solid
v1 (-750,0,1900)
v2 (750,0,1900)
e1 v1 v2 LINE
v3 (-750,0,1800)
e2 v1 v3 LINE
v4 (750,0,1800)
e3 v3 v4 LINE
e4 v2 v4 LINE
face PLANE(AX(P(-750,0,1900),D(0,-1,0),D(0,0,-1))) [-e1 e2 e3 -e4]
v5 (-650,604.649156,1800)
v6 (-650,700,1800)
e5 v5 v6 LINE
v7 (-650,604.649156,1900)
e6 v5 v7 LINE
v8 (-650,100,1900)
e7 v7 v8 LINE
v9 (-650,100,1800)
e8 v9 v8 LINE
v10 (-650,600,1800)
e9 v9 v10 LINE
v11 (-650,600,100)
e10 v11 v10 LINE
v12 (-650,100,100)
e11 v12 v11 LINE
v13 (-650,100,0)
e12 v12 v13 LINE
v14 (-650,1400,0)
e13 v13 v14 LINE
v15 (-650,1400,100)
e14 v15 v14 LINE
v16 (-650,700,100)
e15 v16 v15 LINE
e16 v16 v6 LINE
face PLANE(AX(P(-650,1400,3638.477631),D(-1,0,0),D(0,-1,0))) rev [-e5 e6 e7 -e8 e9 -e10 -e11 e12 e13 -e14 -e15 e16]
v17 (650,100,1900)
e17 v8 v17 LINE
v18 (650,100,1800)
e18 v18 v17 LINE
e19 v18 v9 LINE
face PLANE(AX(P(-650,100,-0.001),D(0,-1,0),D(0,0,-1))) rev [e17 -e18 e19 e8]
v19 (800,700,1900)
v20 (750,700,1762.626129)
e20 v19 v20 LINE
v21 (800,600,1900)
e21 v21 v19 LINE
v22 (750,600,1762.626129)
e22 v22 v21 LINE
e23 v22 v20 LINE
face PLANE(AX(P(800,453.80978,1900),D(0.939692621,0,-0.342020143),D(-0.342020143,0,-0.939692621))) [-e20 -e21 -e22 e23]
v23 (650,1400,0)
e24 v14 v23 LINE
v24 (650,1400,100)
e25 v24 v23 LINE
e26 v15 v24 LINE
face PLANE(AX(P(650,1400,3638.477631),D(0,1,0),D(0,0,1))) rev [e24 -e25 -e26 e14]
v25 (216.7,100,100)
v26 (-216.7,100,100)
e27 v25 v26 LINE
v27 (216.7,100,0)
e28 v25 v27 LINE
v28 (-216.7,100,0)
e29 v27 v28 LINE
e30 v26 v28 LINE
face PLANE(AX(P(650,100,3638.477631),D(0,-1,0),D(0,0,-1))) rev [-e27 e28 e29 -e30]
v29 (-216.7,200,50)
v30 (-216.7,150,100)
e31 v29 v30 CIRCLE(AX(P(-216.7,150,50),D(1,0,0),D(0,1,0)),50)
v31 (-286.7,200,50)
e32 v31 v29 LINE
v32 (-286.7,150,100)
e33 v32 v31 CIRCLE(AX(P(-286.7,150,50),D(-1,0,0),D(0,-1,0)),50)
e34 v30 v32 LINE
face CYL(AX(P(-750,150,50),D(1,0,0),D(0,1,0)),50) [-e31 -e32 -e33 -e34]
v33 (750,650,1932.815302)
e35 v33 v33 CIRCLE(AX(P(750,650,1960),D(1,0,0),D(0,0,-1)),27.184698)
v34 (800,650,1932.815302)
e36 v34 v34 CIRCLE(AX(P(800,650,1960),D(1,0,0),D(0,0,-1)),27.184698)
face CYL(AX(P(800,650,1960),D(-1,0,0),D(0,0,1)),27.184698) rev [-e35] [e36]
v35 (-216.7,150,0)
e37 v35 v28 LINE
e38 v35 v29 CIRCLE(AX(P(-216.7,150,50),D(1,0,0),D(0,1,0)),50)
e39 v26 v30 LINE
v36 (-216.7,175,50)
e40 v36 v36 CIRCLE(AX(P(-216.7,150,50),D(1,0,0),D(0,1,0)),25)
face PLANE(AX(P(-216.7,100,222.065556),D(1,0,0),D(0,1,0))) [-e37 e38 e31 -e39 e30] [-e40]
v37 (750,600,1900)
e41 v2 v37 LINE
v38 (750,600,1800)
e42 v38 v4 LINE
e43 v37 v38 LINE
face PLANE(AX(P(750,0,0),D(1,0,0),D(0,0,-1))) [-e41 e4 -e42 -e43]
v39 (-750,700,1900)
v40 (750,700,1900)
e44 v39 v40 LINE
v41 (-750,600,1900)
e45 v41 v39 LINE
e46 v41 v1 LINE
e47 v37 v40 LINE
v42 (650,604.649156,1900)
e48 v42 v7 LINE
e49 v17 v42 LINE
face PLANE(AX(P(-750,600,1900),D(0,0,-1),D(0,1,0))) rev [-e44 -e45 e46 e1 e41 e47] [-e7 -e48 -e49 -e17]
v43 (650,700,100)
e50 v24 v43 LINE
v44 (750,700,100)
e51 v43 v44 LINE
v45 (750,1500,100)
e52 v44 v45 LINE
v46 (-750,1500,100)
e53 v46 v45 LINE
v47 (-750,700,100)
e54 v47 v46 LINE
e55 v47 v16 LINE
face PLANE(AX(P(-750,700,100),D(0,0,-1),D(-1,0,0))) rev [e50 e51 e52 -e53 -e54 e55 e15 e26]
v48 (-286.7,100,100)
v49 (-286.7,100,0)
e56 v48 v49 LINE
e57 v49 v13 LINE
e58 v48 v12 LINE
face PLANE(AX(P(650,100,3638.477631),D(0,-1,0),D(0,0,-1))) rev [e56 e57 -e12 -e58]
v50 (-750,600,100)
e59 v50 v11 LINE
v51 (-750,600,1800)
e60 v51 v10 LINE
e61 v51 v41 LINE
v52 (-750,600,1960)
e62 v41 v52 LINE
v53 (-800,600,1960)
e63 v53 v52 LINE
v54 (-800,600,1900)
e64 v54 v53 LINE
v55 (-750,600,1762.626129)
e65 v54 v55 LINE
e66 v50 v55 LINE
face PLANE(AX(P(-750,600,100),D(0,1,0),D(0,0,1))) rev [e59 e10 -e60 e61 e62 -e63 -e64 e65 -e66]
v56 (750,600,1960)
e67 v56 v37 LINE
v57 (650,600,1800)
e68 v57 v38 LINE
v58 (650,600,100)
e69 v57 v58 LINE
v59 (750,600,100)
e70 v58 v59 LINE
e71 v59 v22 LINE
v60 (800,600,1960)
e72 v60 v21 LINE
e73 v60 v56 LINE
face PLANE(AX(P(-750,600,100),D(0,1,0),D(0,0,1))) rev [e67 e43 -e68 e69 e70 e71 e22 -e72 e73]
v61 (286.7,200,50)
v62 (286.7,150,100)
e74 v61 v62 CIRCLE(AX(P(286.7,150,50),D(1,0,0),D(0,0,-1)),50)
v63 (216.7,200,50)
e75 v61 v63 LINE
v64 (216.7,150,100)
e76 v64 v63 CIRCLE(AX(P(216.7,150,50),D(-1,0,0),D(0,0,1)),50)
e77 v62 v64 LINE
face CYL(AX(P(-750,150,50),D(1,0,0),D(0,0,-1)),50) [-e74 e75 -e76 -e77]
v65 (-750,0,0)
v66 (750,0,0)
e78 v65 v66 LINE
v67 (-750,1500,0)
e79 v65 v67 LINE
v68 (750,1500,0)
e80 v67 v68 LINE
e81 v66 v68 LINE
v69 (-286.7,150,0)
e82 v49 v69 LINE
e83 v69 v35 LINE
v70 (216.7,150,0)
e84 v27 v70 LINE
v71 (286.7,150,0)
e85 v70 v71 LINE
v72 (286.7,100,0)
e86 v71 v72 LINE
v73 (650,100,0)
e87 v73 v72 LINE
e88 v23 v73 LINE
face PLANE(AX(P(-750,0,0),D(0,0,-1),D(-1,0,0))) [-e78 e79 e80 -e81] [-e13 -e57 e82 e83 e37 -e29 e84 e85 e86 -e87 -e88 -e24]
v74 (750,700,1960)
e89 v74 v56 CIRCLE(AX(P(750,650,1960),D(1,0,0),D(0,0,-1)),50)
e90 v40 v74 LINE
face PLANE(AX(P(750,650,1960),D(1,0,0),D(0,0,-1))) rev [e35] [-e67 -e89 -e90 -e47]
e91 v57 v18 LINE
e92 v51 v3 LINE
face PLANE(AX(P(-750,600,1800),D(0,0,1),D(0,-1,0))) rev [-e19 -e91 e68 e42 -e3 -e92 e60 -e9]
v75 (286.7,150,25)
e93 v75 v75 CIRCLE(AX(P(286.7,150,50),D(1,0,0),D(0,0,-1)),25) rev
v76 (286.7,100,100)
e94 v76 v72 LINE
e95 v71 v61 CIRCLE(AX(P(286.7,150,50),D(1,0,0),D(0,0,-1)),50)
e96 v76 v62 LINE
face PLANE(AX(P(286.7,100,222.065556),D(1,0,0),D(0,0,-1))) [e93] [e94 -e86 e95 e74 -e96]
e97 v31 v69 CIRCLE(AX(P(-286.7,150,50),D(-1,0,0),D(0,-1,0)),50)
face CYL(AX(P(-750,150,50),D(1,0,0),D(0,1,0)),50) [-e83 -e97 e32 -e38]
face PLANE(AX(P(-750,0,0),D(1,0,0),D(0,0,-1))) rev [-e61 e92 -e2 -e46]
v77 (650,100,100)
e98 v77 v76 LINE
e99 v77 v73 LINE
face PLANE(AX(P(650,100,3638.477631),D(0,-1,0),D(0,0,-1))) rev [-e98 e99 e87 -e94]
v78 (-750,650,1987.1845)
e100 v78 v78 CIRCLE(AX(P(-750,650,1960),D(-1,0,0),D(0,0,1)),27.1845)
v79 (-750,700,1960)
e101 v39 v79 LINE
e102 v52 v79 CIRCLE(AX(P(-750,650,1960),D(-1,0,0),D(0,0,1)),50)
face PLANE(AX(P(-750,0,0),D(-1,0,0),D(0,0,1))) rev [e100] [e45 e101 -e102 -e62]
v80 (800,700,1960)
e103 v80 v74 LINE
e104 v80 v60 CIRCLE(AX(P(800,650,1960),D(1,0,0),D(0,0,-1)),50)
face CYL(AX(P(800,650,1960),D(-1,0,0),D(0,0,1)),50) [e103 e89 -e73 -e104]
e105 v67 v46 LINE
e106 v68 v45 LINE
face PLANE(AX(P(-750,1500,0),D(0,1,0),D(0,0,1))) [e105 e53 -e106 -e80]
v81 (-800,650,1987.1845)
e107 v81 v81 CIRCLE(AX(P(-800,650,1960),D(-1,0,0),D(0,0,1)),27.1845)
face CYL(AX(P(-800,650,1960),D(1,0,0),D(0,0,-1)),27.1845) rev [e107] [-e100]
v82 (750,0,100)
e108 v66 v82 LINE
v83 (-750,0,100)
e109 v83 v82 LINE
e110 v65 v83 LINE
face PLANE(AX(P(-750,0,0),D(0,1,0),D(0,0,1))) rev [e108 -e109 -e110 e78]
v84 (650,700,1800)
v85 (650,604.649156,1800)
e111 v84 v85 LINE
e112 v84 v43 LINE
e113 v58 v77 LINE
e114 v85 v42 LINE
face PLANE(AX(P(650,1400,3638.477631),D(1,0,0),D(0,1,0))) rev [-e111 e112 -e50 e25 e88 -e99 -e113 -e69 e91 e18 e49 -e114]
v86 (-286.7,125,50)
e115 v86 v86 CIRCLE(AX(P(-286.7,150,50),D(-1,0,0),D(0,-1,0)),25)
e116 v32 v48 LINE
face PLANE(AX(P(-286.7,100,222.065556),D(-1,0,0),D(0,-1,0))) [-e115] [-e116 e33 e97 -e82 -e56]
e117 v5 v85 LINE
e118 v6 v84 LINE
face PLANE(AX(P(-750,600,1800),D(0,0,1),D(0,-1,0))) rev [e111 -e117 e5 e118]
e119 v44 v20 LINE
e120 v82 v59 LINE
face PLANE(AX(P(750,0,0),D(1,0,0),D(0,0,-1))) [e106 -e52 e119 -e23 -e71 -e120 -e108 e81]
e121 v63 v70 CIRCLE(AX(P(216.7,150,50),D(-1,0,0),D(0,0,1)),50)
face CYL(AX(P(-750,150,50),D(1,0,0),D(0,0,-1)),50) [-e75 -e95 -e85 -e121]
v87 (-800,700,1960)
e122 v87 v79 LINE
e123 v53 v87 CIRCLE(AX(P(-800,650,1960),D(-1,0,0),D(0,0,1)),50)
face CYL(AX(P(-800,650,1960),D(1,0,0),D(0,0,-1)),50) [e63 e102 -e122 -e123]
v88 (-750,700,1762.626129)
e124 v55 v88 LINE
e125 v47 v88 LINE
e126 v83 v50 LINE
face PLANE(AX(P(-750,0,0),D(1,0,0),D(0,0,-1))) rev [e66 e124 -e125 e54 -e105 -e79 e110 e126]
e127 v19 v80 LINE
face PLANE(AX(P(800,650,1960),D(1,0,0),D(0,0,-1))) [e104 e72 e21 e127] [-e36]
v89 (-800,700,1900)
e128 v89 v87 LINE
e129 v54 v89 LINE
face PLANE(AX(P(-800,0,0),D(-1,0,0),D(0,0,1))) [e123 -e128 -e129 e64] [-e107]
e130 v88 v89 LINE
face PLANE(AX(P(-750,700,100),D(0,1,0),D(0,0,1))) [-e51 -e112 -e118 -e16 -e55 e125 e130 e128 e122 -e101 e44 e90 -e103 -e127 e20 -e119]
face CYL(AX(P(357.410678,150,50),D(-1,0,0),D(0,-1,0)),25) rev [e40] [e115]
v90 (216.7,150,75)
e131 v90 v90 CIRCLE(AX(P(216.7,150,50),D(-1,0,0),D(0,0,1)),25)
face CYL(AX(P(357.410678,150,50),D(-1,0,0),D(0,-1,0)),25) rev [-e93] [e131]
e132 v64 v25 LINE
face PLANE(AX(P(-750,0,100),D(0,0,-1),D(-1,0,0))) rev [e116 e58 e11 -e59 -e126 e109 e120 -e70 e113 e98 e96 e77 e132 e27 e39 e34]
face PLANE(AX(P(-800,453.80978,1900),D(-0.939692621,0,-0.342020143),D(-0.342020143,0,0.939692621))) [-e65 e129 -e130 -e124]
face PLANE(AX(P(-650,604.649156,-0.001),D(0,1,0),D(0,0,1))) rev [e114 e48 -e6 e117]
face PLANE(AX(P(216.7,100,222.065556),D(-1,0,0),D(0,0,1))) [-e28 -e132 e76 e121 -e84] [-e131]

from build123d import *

# Parameters (mm, degrees)
SALIENTE_EXTRUIR1_DEPTH = 750
CORTAR_EXTRUIR4_REACH   = 2536.265
CROQUIS3_W              = 1300
CROQUIS3_H              = 1300
CORTAR_EXTRUIR5_REACH   = 2536.265
CROQUIS4_W              = 1300
CROQUIS4_H              = 504.649156168
CROQUIS5_R              = 27.184697772
SALIENTE_EXTRUIR2_DEPTH = 50
SALIENTE_EXTRUIR3_DEPTH = 100
CROQUIS8_R              = 27.1845
SALIENTE_EXTRUIR4_DEPTH = 50
SALIENTE_EXTRUIR5_DEPTH = 100
CROQUIS11_W             = 70
CROQUIS11_H             = 100
SALIENTE_EXTRUIR6_DEPTH = 100
REDONDEO1_R             = 50
CORTAR_EXTRUIR6_REACH   = 2735.316
CROQUIS12_R             = 25


with BuildPart() as part:
    # Croquis1 → Saliente-Extruir1 (new, symmetric)
    with BuildSketch(Plane(origin=(0, 0, 0), x_dir=(0, 0, -1), z_dir=(1, 0, 0))):
        Polygon((-100, 700), (-100, 1500), (0, 1500), (0, 0), (-100, 0), (-100, 600), (-1800, 600), (-1800, 0), (-1900, 0), (-1900, 600), (-1900, 700), align=None)
    extrude(amount=SALIENTE_EXTRUIR1_DEPTH, both=True)

    # Cortar-Extruir4: up to this face of the body (flat: up to its plane)
    cortar_extruir4_end = Plane(part.part.faces().sort_by_distance((0, 300, 1800))[0])
    # Croquis3 → Cortar-Extruir4 (cut, up to the picked face)
    with BuildSketch(Plane(origin=(0, 0, 0), x_dir=(-1, 0, 0), z_dir=(0, 0, -1)), mode=Mode.PRIVATE) as cortar_extruir4_sk1:
        with Locations((0, 750)):
            Rectangle(CROQUIS3_W, CROQUIS3_H)
    cortar_extruir4_tool1 = split(extrude(cortar_extruir4_sk1.sketch, amount=-CORTAR_EXTRUIR4_REACH, mode=Mode.PRIVATE), bisect_by=cortar_extruir4_end, keep=Keep.BOTH, mode=Mode.PRIVATE)
    add(cortar_extruir4_tool1.solids().sort_by(Axis((0, 750, 0), (0, 0, 1)))[0], mode=Mode.SUBTRACT)

    # Croquis4 → Cortar-Extruir5 (cut, up to next)
    with BuildSketch(Plane.XY.offset(1900), mode=Mode.PRIVATE) as cortar_extruir5_sk1:
        with Locations((0, 352.324578084)):
            Rectangle(CROQUIS4_W, CROQUIS4_H)
    cortar_extruir5_tool1 = extrude(cortar_extruir5_sk1.sketch, amount=-CORTAR_EXTRUIR5_REACH, mode=Mode.PRIVATE) & part.part
    add(cortar_extruir5_tool1.solids().sort_by_distance((0, 352.324578, 1900))[0], mode=Mode.SUBTRACT)



with BuildPart() as body_2:
    # Croquis5 → Saliente-Extruir2 (new body)
    with BuildSketch(Plane(origin=(750, 0, 0), x_dir=(0, 0, -1), z_dir=(1, 0, 0))):
        with BuildLine():
            Line((-1960, 600), (-1900, 600))
            Line((-1900, 600), (-1900, 700))
            Line((-1900, 700), (-1960, 700))
            ThreePointArc((-1960, 700), (-2010, 650), (-1960, 600))
        make_face()
        with Locations((-1960, 650)):
            Circle(CROQUIS5_R, mode=Mode.SUBTRACT)
    extrude(amount=SALIENTE_EXTRUIR2_DEPTH)


with BuildPart() as part_1:
    add(part.part)

    add(body_2.part)  # Saliente-Extruir3 merges body 2
    # Croquis6 → Saliente-Extruir3 (add)
    with BuildSketch(Plane(origin=(0, 700, 0), x_dir=(1, 0, 0), z_dir=(0, 1, 0))):
        Polygon((750, -1900), (800, -1900), (750, -1762.626129027), align=None)
    extrude(amount=-SALIENTE_EXTRUIR3_DEPTH)



with BuildPart() as body_2_2:
    # Croquis8 → Saliente-Extruir4 (new body)
    with BuildSketch(Plane.ZY.offset(750)):
        with BuildLine():
            Line((1960, 700), (1900, 700))
            Line((1900, 700), (1900, 600))
            Line((1900, 600), (1960, 600))
            ThreePointArc((1960, 600), (2010, 650), (1960, 700))
        make_face()
        with Locations((1960, 650)):
            Circle(CROQUIS8_R, mode=Mode.SUBTRACT)
    extrude(amount=SALIENTE_EXTRUIR4_DEPTH)


with BuildPart() as part_2:
    add(part_1.part)

    add(body_2_2.part)  # Saliente-Extruir5 merges body 2 2
    # Croquis9 → Saliente-Extruir5 (add)
    with BuildSketch(Plane(origin=(0, 700, 0), x_dir=(1, 0, 0), z_dir=(0, 1, 0))):
        Polygon((-750, -1900), (-800, -1900), (-750, -1762.626129027), align=None)
    extrude(amount=-SALIENTE_EXTRUIR5_DEPTH)

    # Croquis11 → Saliente-Extruir6 (add)
    with BuildSketch(Plane(origin=(0, 0, 0), x_dir=(-1, 0, 0), z_dir=(0, 0, -1))):
        with Locations((-251.7, 150)):
            Rectangle(CROQUIS11_W, CROQUIS11_H)
        with Locations((251.7, 150)):
            Rectangle(CROQUIS11_W, CROQUIS11_H)
    extrude(amount=-SALIENTE_EXTRUIR6_DEPTH)

    # Redondeo1
    redondeo1_edges = [part_2.edges().sort_by_distance(p)[0] for p in [
        (251.7, 200, 100),
        (251.7, 200, 0),
        (-251.7, 200, 100),
        (-251.7, 200, 0),
    ]]
    fillet(redondeo1_edges, radius=REDONDEO1_R - 0.0001)  # a hair under: the kernel refuses the full size

    # Cortar-Extruir6: up to this face of the body (flat: up to its plane)
    cortar_extruir6_end = Plane(part_2.part.faces().sort_by_distance((286.7, 145.332525283, 50))[0])
    # Croquis12 → Cortar-Extruir6 (cut, up to the picked face)
    with BuildSketch(Plane.ZY.offset(286.7), mode=Mode.PRIVATE) as cortar_extruir6_sk1:
        with Locations(Location((50, 150, 0), (0, 0, 270))):
            Circle(CROQUIS12_R)
    cortar_extruir6_tool1 = split(extrude(cortar_extruir6_sk1.sketch, amount=-CORTAR_EXTRUIR6_REACH, mode=Mode.PRIVATE), bisect_by=cortar_extruir6_end, keep=Keep.BOTH, mode=Mode.PRIVATE)
    add(cortar_extruir6_tool1.solids().sort_by(Axis((-286.7, 150, 50), (1, 0, 0)))[0], mode=Mode.SUBTRACT)


solid = part_2.part
